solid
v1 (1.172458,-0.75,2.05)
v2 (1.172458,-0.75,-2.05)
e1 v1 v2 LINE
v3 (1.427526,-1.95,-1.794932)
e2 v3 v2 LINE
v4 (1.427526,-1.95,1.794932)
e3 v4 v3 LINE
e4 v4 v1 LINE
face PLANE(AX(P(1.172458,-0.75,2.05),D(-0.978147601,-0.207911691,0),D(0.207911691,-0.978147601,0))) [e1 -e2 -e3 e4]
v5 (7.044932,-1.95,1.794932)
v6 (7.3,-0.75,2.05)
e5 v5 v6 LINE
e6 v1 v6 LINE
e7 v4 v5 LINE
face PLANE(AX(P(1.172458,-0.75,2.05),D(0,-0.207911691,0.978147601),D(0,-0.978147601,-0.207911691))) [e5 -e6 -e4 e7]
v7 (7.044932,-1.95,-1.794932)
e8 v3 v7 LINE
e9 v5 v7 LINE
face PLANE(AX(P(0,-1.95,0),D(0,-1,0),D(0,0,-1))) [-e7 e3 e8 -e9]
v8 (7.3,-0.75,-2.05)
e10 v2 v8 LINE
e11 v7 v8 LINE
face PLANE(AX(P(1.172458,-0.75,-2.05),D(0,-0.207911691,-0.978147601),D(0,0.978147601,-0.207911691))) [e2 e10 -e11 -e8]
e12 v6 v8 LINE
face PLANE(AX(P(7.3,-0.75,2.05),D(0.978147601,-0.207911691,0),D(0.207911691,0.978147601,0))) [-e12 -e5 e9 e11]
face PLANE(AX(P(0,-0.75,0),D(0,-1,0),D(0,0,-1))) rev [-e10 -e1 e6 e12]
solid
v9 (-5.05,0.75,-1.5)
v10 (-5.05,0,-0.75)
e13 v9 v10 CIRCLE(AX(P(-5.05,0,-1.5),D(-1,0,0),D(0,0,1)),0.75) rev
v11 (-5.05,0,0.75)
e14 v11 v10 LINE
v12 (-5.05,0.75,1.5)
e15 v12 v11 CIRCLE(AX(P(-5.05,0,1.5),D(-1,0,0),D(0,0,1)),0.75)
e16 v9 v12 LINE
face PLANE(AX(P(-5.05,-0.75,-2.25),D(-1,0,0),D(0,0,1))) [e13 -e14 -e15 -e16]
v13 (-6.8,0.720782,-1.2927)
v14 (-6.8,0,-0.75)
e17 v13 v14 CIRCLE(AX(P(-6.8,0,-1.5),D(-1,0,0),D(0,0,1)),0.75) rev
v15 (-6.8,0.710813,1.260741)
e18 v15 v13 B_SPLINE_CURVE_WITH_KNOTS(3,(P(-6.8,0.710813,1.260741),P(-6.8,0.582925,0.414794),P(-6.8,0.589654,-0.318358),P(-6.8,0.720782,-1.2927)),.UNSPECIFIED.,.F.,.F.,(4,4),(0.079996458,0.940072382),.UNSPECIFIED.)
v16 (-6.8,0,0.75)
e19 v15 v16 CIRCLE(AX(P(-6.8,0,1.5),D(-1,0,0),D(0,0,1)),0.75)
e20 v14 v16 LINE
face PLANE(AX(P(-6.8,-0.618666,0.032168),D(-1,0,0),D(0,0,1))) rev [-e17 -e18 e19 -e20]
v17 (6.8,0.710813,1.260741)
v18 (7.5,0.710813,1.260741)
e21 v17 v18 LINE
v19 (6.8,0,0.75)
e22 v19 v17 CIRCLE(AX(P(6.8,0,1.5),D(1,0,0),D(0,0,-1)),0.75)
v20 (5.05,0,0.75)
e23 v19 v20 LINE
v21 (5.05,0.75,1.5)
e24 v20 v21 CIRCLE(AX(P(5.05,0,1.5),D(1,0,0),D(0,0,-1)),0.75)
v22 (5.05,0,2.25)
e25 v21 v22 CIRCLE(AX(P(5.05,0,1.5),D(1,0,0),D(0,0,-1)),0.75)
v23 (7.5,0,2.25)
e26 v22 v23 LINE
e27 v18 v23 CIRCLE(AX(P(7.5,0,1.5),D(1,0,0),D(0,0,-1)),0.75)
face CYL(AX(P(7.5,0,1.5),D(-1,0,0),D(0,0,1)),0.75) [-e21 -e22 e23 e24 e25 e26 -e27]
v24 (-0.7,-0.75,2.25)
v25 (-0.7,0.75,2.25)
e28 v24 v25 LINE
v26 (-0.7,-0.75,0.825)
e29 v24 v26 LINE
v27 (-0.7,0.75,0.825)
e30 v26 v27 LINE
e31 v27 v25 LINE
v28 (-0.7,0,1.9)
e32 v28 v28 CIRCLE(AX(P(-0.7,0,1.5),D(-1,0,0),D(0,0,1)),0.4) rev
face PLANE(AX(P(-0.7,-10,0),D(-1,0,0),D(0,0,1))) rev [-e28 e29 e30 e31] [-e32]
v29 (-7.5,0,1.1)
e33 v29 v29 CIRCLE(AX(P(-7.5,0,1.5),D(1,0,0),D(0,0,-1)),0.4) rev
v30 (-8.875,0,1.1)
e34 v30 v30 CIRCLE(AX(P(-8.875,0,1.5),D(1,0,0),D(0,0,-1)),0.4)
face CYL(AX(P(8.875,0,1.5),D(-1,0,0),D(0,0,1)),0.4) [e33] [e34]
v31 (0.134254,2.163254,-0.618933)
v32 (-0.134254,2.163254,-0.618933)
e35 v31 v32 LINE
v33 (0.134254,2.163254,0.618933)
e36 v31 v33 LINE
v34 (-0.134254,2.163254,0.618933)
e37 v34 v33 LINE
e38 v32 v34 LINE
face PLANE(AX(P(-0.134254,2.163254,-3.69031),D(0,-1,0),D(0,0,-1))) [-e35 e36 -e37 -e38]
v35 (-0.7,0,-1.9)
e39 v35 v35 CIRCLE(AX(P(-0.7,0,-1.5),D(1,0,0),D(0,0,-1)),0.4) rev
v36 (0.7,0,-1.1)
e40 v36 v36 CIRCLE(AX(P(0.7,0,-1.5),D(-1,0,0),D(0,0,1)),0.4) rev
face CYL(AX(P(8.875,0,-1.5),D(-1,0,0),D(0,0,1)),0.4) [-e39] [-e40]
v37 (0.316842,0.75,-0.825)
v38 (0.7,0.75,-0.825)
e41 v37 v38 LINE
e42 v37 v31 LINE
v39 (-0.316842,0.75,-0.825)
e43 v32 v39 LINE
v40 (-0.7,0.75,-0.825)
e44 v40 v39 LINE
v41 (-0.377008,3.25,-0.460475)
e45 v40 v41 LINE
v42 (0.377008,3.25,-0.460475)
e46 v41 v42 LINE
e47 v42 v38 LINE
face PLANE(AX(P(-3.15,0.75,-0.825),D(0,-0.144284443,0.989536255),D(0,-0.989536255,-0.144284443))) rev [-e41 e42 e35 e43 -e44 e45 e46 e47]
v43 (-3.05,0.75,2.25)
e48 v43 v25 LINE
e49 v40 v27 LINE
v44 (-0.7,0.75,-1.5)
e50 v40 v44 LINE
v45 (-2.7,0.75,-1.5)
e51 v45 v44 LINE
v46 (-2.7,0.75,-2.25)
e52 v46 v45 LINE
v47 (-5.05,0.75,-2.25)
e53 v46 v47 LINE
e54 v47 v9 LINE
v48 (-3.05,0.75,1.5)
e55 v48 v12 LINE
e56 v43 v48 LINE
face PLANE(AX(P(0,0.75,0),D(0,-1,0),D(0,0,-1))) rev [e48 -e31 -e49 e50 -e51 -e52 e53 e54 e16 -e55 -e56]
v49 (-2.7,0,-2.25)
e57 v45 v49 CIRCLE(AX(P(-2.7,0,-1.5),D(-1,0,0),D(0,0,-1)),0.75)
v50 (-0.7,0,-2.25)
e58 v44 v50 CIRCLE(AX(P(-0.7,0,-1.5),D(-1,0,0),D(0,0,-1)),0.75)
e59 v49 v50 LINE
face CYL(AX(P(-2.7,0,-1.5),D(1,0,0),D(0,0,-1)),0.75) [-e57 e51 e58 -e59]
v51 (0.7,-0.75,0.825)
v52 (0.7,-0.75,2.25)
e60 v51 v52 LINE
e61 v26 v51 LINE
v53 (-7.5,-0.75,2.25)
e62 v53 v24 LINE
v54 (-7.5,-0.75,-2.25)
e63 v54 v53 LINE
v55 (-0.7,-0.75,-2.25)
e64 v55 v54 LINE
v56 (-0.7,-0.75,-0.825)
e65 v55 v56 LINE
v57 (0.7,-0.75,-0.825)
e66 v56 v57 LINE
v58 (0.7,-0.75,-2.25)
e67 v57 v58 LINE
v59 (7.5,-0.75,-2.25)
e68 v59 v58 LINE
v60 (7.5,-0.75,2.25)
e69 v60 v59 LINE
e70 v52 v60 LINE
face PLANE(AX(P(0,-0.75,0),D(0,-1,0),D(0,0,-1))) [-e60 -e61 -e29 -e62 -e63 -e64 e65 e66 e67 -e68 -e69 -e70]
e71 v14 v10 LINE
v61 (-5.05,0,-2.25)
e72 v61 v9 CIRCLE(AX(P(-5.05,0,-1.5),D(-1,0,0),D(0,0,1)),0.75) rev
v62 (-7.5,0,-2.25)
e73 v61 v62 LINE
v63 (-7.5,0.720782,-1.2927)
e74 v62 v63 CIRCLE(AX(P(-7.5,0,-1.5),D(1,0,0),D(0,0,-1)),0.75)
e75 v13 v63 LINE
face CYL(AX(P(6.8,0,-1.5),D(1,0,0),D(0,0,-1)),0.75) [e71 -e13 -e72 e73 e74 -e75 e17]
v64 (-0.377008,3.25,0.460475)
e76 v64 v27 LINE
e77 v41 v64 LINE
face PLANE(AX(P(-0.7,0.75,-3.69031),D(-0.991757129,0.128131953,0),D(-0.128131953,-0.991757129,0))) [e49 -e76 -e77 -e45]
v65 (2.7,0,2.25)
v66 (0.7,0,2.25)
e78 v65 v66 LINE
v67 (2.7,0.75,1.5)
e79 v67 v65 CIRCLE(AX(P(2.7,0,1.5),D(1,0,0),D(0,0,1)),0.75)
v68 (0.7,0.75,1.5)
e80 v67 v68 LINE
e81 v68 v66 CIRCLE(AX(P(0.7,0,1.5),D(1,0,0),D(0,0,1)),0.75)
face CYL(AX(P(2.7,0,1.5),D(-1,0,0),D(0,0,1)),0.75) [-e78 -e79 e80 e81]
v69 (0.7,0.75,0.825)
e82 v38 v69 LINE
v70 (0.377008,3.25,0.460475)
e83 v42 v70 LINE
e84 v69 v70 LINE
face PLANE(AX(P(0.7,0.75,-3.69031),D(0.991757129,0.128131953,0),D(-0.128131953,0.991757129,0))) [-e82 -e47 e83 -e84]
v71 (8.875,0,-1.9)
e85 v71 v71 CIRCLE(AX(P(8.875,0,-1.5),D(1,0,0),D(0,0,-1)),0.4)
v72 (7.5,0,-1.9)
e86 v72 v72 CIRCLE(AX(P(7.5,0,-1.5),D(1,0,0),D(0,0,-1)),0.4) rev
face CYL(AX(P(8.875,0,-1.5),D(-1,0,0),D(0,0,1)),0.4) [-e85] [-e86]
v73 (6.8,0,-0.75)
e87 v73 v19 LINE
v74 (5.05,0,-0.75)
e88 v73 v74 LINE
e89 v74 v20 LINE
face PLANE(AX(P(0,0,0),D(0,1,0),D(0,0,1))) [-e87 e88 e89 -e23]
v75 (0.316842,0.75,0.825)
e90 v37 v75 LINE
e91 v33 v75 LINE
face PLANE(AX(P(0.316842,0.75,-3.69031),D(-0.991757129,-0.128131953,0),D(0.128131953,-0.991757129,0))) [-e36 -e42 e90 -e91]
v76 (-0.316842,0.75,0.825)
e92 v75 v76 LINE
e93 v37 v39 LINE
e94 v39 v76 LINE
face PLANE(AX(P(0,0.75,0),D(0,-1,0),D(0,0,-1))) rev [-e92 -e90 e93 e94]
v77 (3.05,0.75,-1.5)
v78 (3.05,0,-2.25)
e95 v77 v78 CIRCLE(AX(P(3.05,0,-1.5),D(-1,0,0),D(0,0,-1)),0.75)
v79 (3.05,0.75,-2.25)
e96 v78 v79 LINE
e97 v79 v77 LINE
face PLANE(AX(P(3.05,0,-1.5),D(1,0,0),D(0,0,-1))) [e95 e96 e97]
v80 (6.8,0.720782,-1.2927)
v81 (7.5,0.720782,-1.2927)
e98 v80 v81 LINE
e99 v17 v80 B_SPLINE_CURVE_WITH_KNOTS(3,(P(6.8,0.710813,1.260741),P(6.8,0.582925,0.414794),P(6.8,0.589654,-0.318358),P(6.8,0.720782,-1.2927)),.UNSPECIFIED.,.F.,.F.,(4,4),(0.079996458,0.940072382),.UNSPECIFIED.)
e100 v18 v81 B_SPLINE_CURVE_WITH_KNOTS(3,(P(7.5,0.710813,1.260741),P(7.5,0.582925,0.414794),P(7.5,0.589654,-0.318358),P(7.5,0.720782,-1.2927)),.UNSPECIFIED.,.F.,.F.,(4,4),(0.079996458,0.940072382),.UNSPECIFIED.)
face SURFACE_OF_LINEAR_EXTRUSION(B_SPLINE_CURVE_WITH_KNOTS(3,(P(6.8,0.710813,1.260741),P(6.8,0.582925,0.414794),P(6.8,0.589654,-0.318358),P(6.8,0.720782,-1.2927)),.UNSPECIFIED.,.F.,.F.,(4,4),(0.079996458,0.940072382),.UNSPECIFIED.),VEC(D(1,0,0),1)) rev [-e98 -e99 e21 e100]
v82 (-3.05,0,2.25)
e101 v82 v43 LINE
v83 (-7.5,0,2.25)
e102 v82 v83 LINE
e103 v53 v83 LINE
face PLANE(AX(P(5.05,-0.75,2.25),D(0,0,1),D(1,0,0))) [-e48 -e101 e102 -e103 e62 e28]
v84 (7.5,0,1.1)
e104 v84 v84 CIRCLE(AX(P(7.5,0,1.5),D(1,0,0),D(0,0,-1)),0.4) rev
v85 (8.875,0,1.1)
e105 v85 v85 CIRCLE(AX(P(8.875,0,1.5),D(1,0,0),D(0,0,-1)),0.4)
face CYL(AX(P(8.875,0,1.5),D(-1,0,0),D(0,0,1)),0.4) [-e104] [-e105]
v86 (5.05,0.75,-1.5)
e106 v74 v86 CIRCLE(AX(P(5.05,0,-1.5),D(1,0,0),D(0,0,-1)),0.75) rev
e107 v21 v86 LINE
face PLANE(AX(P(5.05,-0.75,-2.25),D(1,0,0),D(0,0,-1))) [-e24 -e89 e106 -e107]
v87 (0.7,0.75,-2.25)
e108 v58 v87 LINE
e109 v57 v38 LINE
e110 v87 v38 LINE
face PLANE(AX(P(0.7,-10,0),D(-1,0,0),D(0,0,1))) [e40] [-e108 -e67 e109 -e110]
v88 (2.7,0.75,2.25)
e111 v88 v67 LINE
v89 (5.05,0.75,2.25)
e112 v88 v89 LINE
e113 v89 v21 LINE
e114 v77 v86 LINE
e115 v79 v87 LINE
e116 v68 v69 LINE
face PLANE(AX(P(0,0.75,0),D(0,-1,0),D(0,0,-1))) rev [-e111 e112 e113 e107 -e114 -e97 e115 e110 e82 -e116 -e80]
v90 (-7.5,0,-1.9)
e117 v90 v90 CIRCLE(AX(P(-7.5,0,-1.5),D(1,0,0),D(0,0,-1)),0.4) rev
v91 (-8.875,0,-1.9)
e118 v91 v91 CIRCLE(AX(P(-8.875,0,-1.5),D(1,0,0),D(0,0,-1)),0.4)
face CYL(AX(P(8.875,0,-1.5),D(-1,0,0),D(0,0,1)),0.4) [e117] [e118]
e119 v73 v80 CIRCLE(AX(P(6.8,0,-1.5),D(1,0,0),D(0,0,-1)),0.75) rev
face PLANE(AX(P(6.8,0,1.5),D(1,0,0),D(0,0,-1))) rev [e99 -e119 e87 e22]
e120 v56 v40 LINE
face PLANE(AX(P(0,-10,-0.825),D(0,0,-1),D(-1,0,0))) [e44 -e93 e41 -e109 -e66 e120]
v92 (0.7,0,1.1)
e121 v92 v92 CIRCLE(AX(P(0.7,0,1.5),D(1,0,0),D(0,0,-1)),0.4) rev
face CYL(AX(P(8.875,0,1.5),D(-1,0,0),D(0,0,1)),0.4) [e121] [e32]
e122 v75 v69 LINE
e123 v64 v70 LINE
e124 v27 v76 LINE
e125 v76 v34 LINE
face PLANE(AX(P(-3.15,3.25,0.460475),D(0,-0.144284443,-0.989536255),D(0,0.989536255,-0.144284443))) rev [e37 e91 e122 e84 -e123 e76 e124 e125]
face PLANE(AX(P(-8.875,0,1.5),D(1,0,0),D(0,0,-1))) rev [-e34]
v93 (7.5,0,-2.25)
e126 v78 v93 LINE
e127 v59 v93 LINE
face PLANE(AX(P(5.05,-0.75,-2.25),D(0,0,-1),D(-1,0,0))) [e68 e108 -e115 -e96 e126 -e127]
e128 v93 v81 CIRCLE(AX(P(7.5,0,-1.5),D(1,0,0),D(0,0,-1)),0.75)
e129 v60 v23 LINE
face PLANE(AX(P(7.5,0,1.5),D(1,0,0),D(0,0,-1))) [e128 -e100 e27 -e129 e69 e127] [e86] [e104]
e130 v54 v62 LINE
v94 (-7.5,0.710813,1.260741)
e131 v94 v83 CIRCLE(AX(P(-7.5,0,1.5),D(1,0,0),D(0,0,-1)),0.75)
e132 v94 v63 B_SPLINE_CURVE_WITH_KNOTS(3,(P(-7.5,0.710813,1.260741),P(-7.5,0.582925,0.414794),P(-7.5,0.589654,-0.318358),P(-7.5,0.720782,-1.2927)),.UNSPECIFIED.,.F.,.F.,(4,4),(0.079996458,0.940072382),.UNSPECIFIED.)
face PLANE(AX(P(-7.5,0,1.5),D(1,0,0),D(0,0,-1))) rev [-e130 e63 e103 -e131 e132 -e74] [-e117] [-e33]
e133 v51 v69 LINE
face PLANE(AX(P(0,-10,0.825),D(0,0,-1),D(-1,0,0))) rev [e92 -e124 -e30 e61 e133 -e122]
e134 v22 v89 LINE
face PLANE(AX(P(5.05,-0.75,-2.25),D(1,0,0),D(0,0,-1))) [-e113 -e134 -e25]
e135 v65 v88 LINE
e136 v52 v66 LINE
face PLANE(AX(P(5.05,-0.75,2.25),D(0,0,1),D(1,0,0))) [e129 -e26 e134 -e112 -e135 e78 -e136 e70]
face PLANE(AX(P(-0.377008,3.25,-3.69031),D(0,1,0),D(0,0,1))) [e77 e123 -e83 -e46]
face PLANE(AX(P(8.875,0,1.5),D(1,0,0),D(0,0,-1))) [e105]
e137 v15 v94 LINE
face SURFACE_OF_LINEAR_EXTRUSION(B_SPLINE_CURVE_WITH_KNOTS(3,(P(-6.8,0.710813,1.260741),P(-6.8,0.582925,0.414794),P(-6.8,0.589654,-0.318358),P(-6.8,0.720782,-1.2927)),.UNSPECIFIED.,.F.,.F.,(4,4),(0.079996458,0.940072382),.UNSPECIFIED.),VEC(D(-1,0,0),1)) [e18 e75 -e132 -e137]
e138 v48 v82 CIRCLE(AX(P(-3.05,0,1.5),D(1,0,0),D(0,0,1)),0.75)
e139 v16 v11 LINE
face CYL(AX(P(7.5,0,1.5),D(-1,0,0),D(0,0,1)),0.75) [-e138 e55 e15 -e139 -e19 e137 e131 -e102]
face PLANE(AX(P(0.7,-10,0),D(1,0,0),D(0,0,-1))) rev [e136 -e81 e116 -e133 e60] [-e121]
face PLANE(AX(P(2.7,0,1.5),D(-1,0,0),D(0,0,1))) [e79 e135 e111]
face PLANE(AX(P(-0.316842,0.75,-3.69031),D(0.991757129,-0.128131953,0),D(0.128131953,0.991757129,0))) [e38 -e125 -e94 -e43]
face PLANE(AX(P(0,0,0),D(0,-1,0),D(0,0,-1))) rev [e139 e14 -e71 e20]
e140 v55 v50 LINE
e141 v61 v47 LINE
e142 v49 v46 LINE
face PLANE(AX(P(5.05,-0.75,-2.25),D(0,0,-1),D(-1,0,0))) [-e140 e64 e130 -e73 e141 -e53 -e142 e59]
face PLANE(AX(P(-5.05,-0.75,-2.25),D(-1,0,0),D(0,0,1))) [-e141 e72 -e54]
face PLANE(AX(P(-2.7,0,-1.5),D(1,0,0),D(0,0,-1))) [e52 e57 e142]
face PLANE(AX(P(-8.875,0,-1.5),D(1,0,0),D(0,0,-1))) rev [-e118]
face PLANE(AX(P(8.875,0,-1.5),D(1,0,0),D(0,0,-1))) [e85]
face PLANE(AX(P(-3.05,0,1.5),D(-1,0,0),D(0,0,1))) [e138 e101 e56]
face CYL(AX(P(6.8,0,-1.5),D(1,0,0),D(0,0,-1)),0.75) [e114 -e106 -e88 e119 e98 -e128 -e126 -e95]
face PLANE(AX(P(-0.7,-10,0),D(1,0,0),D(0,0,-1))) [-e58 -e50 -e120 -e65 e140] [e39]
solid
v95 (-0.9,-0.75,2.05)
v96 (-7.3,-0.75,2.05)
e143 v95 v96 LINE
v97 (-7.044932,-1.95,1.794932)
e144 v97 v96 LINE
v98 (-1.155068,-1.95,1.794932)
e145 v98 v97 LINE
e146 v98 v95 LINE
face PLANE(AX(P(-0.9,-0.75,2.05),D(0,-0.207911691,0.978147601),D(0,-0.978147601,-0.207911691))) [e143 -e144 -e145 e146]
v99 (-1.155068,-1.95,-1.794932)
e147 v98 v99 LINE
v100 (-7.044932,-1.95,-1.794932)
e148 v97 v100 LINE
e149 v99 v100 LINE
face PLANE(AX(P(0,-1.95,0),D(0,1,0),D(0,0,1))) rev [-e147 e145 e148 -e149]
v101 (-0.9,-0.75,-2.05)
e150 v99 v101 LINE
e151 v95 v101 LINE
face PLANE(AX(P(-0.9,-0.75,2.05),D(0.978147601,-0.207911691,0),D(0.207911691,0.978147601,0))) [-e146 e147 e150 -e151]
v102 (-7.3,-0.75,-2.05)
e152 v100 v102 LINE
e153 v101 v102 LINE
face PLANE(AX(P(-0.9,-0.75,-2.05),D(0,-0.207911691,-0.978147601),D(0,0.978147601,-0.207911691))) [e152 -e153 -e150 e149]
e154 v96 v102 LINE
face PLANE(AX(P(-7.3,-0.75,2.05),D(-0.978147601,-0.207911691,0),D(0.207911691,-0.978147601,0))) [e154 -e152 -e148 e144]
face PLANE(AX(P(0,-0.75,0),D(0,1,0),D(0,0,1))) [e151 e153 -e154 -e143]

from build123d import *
from build123d.topology import SkipClean

# Parameters (mm, degrees)
ESBO_O2_R                          = 0.75
RESSALTO_EXTRUS_O1_DEPTH           = 7.5
RESSALTO_EXTRUS_O1_2_DEPTH         = 7.5
RESSALTO_EXTRUS_O2_DEPTH           = 0.7
RESSALTO_EXTRUS_O3_START           = -0.7
RESSALTO_EXTRUS_O3_DEPTH           = 0.7
RESSALTO_EXTRUS_O4_DEPTH           = 0.75
RESSALTO_EXTRUS_O4_DEPTH_BACK      = 0.75
ESBO_O5_W                          = 10.1
ESBO_O5_H                          = 4.5
ESBO_O6_W                          = 1.4
ESBO_O6_H                          = 1.425
CORTE_EXTRUS_O1_DEPTH              = 10.75
CORTE_EXTRUS_O4_DEPTH              = 2
CORTE_EXTRUS_O5_DEPTH              = 2
CORTE_EXTRUS_O6_START              = -2
CORTE_EXTRUS_O6_DEPTH              = 2
CORTE_EXTRUS_O7_START              = -2
CORTE_EXTRUS_O7_DEPTH              = 2
RESSALTO_EXTRUS_O6_DEPTH           = 1.65
CORTE_EXTRUS_O8_DEPTH              = 8.2
ESBO_O17_R                         = 0.4
RESSALTO_EXTRUS_O7_DEPTH           = 8.875
ESBO_O18_W                         = 2.45
ESBO_O18_H                         = 4.5
RESSALTO_EXTRUS_O8_DEPTH           = 0.75
ESBO_O14_W                         = 6.4
ESBO_O14_H                         = 4.1
RESSALTO_EXTRUS_O9_DEPTH           = 1.2
RESSALTO_EXTRUS_O9_DRAFT           = 12
ESBO_O14_W_2                       = 6.127542103
RESSALTO_EXTRUS_O9_PROFILE_2_DEPTH = 1.2
RESSALTO_EXTRUS_O9_PROFILE_2_DRAFT = 12


with BuildPart() as part:
    # Esboço2 → Ressalto-extrusão1 (new, symmetric)
    with BuildSketch(Plane(origin=(0, 0, 0), x_dir=(0, 0, -1), z_dir=(1, 0, 0))):
        with Locations((-1.5, 0)):
            Circle(ESBO_O2_R)
    extrude(amount=RESSALTO_EXTRUS_O1_DEPTH, both=True)



with BuildPart() as body_2:
    # Esboço2 → Ressalto-extrus_o1 2 (new, symmetric)
    with BuildSketch(Plane(origin=(0, 0, 0), x_dir=(0, 0, -1), z_dir=(1, 0, 0))):
        with Locations((1.5, 0)):
            Circle(ESBO_O2_R)
    extrude(amount=RESSALTO_EXTRUS_O1_2_DEPTH, both=True)


with BuildPart() as part_1:
    add(part.part)

    add(body_2.part)  # Ressalto-extrusão2 merges body 2
    # Esboço3 → Ressalto-extrusão2 (add)
    with BuildSketch(Plane(origin=(7.5, 0, 0), x_dir=(0, 0, -1), z_dir=(1, 0, 0))):
        with BuildLine():
            ThreePointArc((-1.260740828, 0.710812949), (-2.25, 0), (-1.260740828, -0.710812949))
            add(Edge.make_bspline(
                [(-1.260740828, -0.710812949), (-0.414793738, -0.582924516), (0.318358464, -0.589654398), (1.292699553, -0.720781884)],
                knots=[0.079996458, 0.079996458, 0.079996458, 0.079996458, 0.940072382, 0.940072382, 0.940072382, 0.940072382], degree=3))
            ThreePointArc((1.292699553, -0.720781884), (2.25, 0), (1.292699553, 0.720781884))
            add(Edge.make_bspline(
                [(-1.260740828, 0.710812949), (-0.414793738, 0.582924516), (0.318358464, 0.589654398), (1.292699553, 0.720781884)],
                knots=[0.079996458, 0.079996458, 0.079996458, 0.079996458, 0.940072382, 0.940072382, 0.940072382, 0.940072382], degree=3))
        make_face()
    extrude(amount=-RESSALTO_EXTRUS_O2_DEPTH)

    # Esboço4 → Ressalto-extrusão3 (add)
    with SkipClean():  # the faces are left unmerged after this step: merging them gives an invalid solid
        with BuildSketch(Plane.ZY.offset(7.5).offset(RESSALTO_EXTRUS_O3_START)):
            with BuildLine():
                ThreePointArc((1.260740828, -0.710812949), (2.25, 0), (1.260740828, 0.710812949))
                add(Edge.make_bspline(
                    [(1.260740828, 0.710812949), (0.414793738, 0.582924516), (-0.318358464, 0.589654398), (-1.292699553, 0.720781884)],
                    knots=[0.079996458, 0.079996458, 0.079996458, 0.079996458, 0.940072382, 0.940072382, 0.940072382, 0.940072382], degree=3))
                ThreePointArc((-1.292699553, 0.720781884), (-2.25, 0), (-1.292699553, -0.720781884))
                add(Edge.make_bspline(
                    [(-1.292699553, -0.720781884), (-0.318358464, -0.589654398), (0.414793738, -0.582924516), (1.260740828, -0.710812949)],
                    knots=[0.079996458, 0.079996458, 0.079996458, 0.079996458, 0.940072382, 0.940072382, 0.940072382, 0.940072382], degree=3))
            make_face()
        extrude(amount=RESSALTO_EXTRUS_O3_DEPTH)

    # Esboço5 → Ressalto-extrusão4 (add, two sides: drawn at the far end of the back side and taken through both)
    with SkipClean():  # the faces are left unmerged after this step: merging them gives an invalid solid
        with BuildSketch(Plane(origin=(0, 0, 0), x_dir=(1, 0, 0), z_dir=(0, 1, 0)).offset(-RESSALTO_EXTRUS_O4_DEPTH_BACK)):
            Rectangle(ESBO_O5_W, ESBO_O5_H)
        extrude(amount=RESSALTO_EXTRUS_O4_DEPTH + RESSALTO_EXTRUS_O4_DEPTH_BACK)

    # Esboço6 → Corte-extrusão1 (cut)
    with SkipClean():  # the faces are left unmerged after this step: merging them gives an invalid solid
        with BuildSketch(Plane(origin=(0, 0.75, 0), x_dir=(1, 0, 0), z_dir=(0, 1, 0))):
            with Locations((0, -1.5375)):
                Rectangle(ESBO_O6_W, ESBO_O6_H)
            with Locations((0, 1.5375)):
                Rectangle(ESBO_O6_W, ESBO_O6_H)
        extrude(amount=-CORTE_EXTRUS_O1_DEPTH, mode=Mode.SUBTRACT)

    # Esboço10 → Corte-extrusão4 (cut)
    with SkipClean():  # the faces are left unmerged after this step: merging them gives an invalid solid
        with BuildSketch(Plane(origin=(5.05, 0, 0), x_dir=(0, 0, -1), z_dir=(1, 0, 0))):
            with BuildLine():
                Line((2.25, 0), (2.25, 0.75))
                Line((2.25, 0.75), (1.5, 0.75))
                ThreePointArc((1.5, 0.75), (2.030330086, 0.530330086), (2.25, 0))
            make_face()
        extrude(amount=-CORTE_EXTRUS_O4_DEPTH, mode=Mode.SUBTRACT)

    # Esboço11 → Corte-extrusão5 (cut)
    with SkipClean():  # the faces are left unmerged after this step: merging them gives an invalid solid
        with BuildSketch(Plane(origin=(-0.7, 0, 0), x_dir=(0, 0, -1), z_dir=(1, 0, 0))):
            with BuildLine():
                Line((2.25, 0), (2.25, 0.75))
                Line((2.25, 0.75), (1.5, 0.75))
                ThreePointArc((1.5, 0.75), (2.030330086, 0.530330086), (2.25, 0))
            make_face()
        extrude(amount=-CORTE_EXTRUS_O5_DEPTH, mode=Mode.SUBTRACT)

    # Esboço12 → Corte-extrusão6 (cut)
    with SkipClean():  # the faces are left unmerged after this step: merging them gives an invalid solid
        with BuildSketch(Plane.ZY.offset(5.05).offset(CORTE_EXTRUS_O6_START)):
            with BuildLine():
                Line((2.25, 0), (2.25, 0.75))
                Line((2.25, 0.75), (1.5, 0.75))
                ThreePointArc((1.5, 0.75), (2.030330086, 0.530330086), (2.25, 0))
            make_face()
        extrude(amount=CORTE_EXTRUS_O6_DEPTH, mode=Mode.SUBTRACT)

    # Esboço13 → Corte-extrusão7 (cut)
    with SkipClean():  # the faces are left unmerged after this step: merging them gives an invalid solid
        with BuildSketch(Plane.ZY.offset(-0.7).offset(CORTE_EXTRUS_O7_START)):
            with BuildLine():
                Line((2.25, 0), (2.25, 0.75))
                Line((2.25, 0.75), (1.5, 0.75))
                ThreePointArc((1.5, 0.75), (2.030330086, 0.530330086), (2.25, 0))
            make_face()
        extrude(amount=CORTE_EXTRUS_O7_DEPTH, mode=Mode.SUBTRACT)

    # Esboço15 → Ressalto-extrusão6 (add)
    with SkipClean():  # the faces are left unmerged after this step: merging them gives an invalid solid
        with BuildSketch(Plane.XY.offset(0.825)):
            Polygon((-0.7, 0.75), (-0.377007733, 3.25), (0.377007733, 3.25), (0.7, 0.75), (0.316841675, 0.75), (0.134253605, 2.163254196), (-0.134253605, 2.163254196), (-0.316841675, 0.75), align=None)
        extrude(amount=-RESSALTO_EXTRUS_O6_DEPTH)

    # Esboço16 → Corte-extrusão8 (cut)
    with SkipClean():  # the faces are left unmerged after this step: merging them gives an invalid solid
        with BuildSketch(Plane(origin=(5.05, 0, 0), x_dir=(0, 0, -1), z_dir=(1, 0, 0))):
            Polygon((-0.46047459, 3.25), (0.46047459, 3.25), (0.825, 0.75), (1.700771093, 3.688563276), (-1.641477372, 3.918008251), (-0.825, 0.75), align=None)
        extrude(amount=-CORTE_EXTRUS_O8_DEPTH, mode=Mode.SUBTRACT)

    # Esboço17 → Ressalto-extrusão7 (add, symmetric)
    with SkipClean():  # the faces are left unmerged after this step: merging them gives an invalid solid
        with BuildSketch(Plane(origin=(0, 0, 0), x_dir=(0, 0, -1), z_dir=(1, 0, 0))):
            with Locations(Location((-1.5, 0, 0), (0, 0, 180))):
                Circle(ESBO_O17_R)
            with Locations(Location((1.5, 0, 0), (0, 0, 180))):
                Circle(ESBO_O17_R)
        extrude(amount=RESSALTO_EXTRUS_O7_DEPTH, both=True)

    # Esboço18 → Ressalto-extrusão8 (add)
    with SkipClean():  # the faces are left unmerged after this step: merging them gives an invalid solid
        with BuildSketch(Plane(origin=(0, 0, 0), x_dir=(1, 0, 0), z_dir=(0, 1, 0))):
            with Locations((6.275, 0)):
                Rectangle(ESBO_O18_W, ESBO_O18_H)
            with Locations((-6.275, 0)):
                Rectangle(ESBO_O18_W, ESBO_O18_H)
        extrude(amount=-RESSALTO_EXTRUS_O8_DEPTH)


with BuildPart() as body_2_2:
    # Esboço14 → Ressalto-extrusão9 (with draft: the straight prism first)
    with BuildSketch(Plane.XZ.offset(0.75)):
        with Locations((-4.1, 0)):
            Rectangle(ESBO_O14_W, ESBO_O14_H)
    extrude(amount=RESSALTO_EXTRUS_O9_DEPTH)
    # Ressalto-extrusão9: the draft: its side faces are tilted about the plane it starts from
    ressalto_extrus_o9_sides = [body_2_2.faces().sort_by_distance(p)[0] for p in [
        (-4.1, -1.35, 2.05),
        (-7.3, -1.35, 0),
        (-4.1, -1.35, -2.05),
        (-0.9, -1.35, 0),
    ]]
    draft(ressalto_extrus_o9_sides, Plane.XZ.offset(0.75), RESSALTO_EXTRUS_O9_DRAFT)


with BuildPart() as body_3:
    # Esboço14 → Ressalto-extrusão9 profile 2 (with draft: the straight prism first)
    with BuildSketch(Plane.XZ.offset(0.75)):
        with Locations((4.236228949, 0)):
            Rectangle(ESBO_O14_W_2, ESBO_O14_H)
    extrude(amount=RESSALTO_EXTRUS_O9_PROFILE_2_DEPTH)
    # Ressalto-extrusão9 profile 2: the draft: its side faces are tilted about the plane it starts from
    ressalto_extrus_o9_profile_2_sides = [body_3.faces().sort_by_distance(p)[0] for p in [
        (4.236228948, -1.35, 2.05),
        (1.172457897, -1.35, 0),
        (4.236228948, -1.35, -2.05),
        (7.3, -1.35, 0),
    ]]
    draft(ressalto_extrus_o9_profile_2_sides, Plane.XZ.offset(0.75), RESSALTO_EXTRUS_O9_PROFILE_2_DRAFT)


solid = Compound([part_1.part, body_2_2.part, body_3.part])
